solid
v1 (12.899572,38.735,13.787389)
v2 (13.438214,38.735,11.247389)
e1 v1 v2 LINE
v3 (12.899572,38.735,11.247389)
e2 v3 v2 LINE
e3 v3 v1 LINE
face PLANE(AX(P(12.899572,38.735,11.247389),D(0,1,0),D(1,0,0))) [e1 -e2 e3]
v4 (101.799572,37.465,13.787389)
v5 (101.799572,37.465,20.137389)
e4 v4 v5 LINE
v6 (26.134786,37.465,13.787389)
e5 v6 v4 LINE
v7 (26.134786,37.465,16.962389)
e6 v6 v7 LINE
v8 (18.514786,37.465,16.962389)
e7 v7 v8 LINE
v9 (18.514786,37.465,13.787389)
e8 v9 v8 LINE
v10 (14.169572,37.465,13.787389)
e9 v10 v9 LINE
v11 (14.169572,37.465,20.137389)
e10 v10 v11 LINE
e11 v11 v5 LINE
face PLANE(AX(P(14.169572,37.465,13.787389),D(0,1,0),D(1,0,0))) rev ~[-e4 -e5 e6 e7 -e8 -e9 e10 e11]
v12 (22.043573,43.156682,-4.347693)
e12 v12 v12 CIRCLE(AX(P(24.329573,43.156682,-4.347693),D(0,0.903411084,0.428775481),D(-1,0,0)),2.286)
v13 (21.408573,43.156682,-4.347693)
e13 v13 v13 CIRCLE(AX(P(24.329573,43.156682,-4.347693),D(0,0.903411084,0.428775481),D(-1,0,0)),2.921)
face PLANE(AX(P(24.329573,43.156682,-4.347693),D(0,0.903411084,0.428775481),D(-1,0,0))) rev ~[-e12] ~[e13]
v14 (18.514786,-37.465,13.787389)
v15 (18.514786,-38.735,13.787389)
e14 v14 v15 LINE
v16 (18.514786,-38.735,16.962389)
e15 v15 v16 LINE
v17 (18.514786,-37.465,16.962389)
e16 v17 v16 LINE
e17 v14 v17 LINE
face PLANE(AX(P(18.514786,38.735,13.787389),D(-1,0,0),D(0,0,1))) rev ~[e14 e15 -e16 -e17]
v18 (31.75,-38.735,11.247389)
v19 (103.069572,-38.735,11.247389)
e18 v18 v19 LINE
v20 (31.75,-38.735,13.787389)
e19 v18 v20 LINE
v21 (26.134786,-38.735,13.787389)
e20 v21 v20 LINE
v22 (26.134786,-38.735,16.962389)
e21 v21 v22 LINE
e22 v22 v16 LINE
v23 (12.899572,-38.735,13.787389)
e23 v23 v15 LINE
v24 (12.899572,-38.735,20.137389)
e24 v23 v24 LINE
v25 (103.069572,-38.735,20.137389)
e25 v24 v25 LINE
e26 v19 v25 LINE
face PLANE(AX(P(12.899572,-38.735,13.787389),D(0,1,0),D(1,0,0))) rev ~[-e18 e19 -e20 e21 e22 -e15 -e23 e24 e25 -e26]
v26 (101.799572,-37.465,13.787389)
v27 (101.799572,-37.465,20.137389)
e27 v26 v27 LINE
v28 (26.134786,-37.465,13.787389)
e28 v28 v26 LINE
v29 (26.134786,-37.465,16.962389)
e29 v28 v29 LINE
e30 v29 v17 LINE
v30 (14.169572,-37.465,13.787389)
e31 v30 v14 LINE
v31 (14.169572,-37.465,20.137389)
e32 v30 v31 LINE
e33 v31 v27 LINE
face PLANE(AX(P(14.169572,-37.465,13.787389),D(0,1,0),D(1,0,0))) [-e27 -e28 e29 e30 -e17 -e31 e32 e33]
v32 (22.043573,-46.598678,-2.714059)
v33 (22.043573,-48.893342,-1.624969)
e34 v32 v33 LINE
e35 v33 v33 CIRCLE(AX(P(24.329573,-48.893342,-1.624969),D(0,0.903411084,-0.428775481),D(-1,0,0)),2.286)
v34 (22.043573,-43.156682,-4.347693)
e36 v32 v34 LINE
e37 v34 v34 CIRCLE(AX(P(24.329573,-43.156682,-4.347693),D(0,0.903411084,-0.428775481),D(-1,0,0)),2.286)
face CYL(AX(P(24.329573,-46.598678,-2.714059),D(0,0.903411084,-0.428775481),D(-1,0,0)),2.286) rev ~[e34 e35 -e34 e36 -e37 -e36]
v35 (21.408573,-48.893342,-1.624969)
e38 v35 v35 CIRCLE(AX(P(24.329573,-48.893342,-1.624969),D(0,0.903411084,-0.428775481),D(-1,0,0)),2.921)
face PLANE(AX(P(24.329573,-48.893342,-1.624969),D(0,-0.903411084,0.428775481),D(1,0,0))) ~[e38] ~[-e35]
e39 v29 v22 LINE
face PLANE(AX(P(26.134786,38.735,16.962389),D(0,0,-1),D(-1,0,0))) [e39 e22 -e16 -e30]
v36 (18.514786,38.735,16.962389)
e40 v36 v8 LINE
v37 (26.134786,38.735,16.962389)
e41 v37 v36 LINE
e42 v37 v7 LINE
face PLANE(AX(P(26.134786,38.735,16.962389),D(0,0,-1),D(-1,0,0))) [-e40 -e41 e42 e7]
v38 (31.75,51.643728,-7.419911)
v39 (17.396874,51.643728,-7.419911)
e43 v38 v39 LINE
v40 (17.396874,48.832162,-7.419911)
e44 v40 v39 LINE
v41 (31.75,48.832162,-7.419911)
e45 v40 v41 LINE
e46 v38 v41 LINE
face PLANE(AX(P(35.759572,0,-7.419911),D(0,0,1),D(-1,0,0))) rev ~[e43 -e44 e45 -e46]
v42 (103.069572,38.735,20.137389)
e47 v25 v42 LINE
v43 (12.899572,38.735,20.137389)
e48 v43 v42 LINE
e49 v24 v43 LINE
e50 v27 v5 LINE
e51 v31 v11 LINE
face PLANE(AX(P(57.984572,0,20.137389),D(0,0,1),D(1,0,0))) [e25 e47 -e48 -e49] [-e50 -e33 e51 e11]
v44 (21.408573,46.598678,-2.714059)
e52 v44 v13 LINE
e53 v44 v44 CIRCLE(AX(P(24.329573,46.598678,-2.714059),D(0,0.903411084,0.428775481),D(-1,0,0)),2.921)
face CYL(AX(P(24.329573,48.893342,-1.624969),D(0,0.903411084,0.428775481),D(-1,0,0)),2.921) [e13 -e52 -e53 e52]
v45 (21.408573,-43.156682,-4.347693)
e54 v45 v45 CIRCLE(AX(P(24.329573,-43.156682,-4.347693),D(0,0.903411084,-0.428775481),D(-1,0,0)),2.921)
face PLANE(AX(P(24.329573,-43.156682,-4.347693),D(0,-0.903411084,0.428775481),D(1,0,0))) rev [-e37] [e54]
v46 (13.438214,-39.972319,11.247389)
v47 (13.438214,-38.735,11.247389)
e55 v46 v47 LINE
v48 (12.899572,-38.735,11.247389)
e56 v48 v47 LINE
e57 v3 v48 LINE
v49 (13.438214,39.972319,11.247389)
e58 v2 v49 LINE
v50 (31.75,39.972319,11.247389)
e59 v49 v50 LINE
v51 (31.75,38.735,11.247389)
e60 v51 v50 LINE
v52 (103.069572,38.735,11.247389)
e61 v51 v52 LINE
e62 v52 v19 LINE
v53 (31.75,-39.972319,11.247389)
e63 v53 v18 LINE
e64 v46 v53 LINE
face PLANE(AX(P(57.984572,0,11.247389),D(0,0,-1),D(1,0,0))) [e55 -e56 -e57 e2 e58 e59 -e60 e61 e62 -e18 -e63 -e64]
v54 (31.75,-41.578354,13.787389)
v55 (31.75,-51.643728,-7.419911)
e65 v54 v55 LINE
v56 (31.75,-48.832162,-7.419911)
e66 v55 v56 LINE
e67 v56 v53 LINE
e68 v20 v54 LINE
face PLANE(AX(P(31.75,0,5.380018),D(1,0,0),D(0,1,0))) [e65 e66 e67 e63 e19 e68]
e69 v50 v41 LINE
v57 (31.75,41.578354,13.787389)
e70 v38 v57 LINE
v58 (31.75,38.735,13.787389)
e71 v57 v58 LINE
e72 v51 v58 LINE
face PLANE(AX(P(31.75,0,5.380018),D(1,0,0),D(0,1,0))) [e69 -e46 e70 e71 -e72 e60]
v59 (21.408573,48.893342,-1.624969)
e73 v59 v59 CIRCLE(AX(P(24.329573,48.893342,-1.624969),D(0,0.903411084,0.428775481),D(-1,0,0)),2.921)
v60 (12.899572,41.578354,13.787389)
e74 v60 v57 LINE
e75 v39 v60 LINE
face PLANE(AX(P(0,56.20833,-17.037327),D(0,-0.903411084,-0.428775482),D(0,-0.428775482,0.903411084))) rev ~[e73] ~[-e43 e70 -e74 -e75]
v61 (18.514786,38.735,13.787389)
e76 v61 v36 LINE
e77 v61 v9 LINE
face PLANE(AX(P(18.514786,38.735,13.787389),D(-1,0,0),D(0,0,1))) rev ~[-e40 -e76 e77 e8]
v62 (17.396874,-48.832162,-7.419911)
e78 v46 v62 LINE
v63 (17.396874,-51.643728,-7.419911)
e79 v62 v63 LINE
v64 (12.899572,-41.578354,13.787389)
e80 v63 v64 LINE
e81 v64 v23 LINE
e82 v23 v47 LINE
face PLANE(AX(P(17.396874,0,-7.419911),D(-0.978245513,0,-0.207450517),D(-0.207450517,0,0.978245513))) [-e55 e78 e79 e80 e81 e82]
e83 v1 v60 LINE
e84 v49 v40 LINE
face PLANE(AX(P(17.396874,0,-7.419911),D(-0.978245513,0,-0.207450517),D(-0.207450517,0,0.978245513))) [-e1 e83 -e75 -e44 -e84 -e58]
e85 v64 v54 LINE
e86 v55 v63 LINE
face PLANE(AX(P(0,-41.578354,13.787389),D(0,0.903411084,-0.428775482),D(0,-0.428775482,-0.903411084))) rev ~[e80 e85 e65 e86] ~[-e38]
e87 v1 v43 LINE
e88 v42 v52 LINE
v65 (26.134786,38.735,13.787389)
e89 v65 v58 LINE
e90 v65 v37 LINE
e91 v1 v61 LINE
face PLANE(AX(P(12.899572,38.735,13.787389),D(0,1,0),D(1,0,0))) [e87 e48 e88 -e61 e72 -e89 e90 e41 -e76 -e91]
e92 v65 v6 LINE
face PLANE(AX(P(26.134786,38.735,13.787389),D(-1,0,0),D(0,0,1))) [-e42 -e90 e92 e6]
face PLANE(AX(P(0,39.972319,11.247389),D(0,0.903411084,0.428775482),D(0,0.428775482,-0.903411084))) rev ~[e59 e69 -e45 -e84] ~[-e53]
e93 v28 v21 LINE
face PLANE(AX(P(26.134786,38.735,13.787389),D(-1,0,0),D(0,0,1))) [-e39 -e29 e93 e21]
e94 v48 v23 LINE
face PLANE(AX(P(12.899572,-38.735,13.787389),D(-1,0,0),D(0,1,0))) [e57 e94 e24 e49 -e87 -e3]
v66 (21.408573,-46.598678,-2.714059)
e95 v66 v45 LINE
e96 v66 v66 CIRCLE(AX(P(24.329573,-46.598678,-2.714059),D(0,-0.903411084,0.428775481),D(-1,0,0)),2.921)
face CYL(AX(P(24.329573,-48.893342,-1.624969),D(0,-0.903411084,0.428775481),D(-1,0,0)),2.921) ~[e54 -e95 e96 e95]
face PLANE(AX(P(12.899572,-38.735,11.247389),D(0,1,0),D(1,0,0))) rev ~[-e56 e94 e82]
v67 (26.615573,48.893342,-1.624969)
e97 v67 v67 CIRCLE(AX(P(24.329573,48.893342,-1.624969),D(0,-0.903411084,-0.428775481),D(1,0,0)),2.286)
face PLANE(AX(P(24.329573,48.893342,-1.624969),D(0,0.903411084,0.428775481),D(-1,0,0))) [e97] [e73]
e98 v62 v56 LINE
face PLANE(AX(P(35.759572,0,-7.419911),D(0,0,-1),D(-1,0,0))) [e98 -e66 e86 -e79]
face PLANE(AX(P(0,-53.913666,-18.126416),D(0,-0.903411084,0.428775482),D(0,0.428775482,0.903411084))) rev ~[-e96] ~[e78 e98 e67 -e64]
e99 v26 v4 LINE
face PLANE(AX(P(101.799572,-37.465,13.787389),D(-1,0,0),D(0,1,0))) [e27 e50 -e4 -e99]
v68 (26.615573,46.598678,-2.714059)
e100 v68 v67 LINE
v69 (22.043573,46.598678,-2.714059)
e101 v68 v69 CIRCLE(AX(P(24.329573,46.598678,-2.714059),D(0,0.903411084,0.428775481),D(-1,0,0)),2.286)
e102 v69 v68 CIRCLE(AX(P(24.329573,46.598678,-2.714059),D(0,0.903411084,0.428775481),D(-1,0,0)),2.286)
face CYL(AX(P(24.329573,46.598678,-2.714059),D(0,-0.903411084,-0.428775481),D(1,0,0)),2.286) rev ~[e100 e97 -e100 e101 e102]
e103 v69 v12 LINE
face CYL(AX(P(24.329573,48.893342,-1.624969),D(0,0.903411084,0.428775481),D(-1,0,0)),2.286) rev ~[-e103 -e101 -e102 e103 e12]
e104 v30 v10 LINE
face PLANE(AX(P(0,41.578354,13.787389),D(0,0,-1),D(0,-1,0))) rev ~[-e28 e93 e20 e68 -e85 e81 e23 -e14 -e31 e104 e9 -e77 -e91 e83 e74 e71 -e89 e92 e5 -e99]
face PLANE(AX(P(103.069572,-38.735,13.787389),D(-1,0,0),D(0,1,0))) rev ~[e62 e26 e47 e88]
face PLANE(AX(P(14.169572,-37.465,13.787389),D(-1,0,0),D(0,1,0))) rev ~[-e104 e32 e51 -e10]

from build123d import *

# Parameters (mm, degrees)
F1_DEPTH      = 31.75
F2_R          = 0.127
F3_DEPTH      = 56.2093301913
F3_DEPTH_BACK = 56.2093301913
F4_W          = 90.17
F4_H          = 77.47
F5_DEPTH      = 2.54
F6_W          = 90.17
F6_H          = 77.47
F6_W_2        = 87.63
F6_H_2        = 74.93
F7_DEPTH      = 6.35
F11_W         = 7.62
F11_H         = 3.175
F12_DEPTH     = 79.756
F14_R         = 2.921
F14_R_2       = 2.286
F15_DEPTH     = 6.35
F15_FACE_R    = 2.286
F16_DEPTH     = 12.9286
F17_R         = 2.070357412
F18_DEPTH     = 25.4
F20_R         = 2.286
F21_DEPTH     = 25.4


# Not quite as in the source:
# - a pattern or mirror of a feature is missing from the dataset's text; its kind, count and spacing are read off the source's solid


with BuildPart() as f1:
    # F0 (on Right) → F1 (new body)
    with BuildSketch(Plane.YZ):
        Polygon((-53.9136660383, -18.1264164896), (-39.9723188616, 11.2473889307), (39.9723188616, 11.2473889307), (53.9136660383, -18.1264164896), (56.2083301913, -17.0373267665), (41.5783543673, 13.7873889307), (-41.5783543673, 13.7873889307), (-56.2083301913, -17.0373267665), align=None)
    extrude(amount=F1_DEPTH)

    # F2 (on Front) → F3 (cut, two sides)
    with BuildSketch(Plane.XZ) as f3_sk:
        Polygon((12.8995720297, 13.7873889307), (0, 13.7873889307), (0, -18.1264164896), (19.6673367172, -18.1264164896), (35.7595719397, -19.0736036748), (35.7595719397, -7.4199110855), (17.3968738801, -7.4199110855), align=None)
        with Locations((24.329572916, -1.6249689179)):
            Circle(F2_R)
    extrude(amount=-F3_DEPTH, mode=Mode.SUBTRACT)
    extrude(f3_sk.sketch, amount=F3_DEPTH_BACK, mode=Mode.SUBTRACT)

    # F4 (on face) → F5 (join, through all)
    with BuildSketch(Plane(origin=(0, 0, 11.2473889307), x_dir=(1, 0, 0), z_dir=(0, 0, -1))):
        with Locations((57.9845720297, 0)):
            Rectangle(F4_W, F4_H)
    extrude(amount=-F5_DEPTH)

    # F6 (on face) → F7 (join)
    with BuildSketch(Plane.XY.offset(13.7873889307)):
        with Locations((57.9845720297, 0)):
            Rectangle(F6_W, F6_H)
        with Locations((57.9845720297, 0)):
            Rectangle(F6_W_2, F6_H_2, mode=Mode.SUBTRACT)
    extrude(amount=F7_DEPTH)

    # F11 (on face) → F12 (cut)
    with BuildSketch(Plane(origin=(0, 38.735, 0), x_dir=(-1, 0, 0), z_dir=(0, 1, 0))):
        with Locations((-22.3247860149, 15.3748889307)):
            Rectangle(F11_W, F11_H)
    extrude(amount=-F12_DEPTH, mode=Mode.SUBTRACT)

    # F14 (on face) → F15 (join)
    with BuildSketch(Plane(origin=(0, 39.2749300586, 18.6406026544), x_dir=(-1, 0, 0), z_dir=(0, 0.9034110839, 0.4287754815))):
        with Locations((-24.329572916, -22.4322813106)):
            Circle(F14_R)
        with Locations((-24.329572916, -22.4322813106)):
            Circle(F14_R_2, mode=Mode.SUBTRACT)
    f15 = extrude(amount=-F15_DEPTH)

    # F15_copies: F15 across plane
    add(f15.mirror(Plane(origin=(0, 0, 0), x_dir=(0, 0, -1), z_dir=(0, -1, 0))))

    # F14 (on face) + F15_face (on face) → F16 (cut)
    with BuildSketch(Plane(origin=(0, 39.2749300586, 18.6406026544), x_dir=(-1, 0, 0), z_dir=(0, 0.9034110839, 0.4287754815))):
        with Locations((-24.329572916, -22.4322813106)):
            Circle(F14_R)
        with Locations((-24.329572916, -22.4322813106)):
            Circle(F14_R_2, mode=Mode.SUBTRACT)
    with BuildSketch(Plane(origin=(24.329572916, 46.6004501275, -2.7177921697), x_dir=(1, 0, 0), z_dir=(0, -0.9034110839, -0.4287754815))):
        with Locations((0, 0.004132702)):
            Circle(F15_FACE_R)
        with BuildLine():
            add(Edge.make_bspline(
                [(0.127, 1.2096633209), (0.127, 0.9661745521), (-0.0635, 1.0879189365), (-0.254, 1.2096633209), (-0.0635, 1.3314077053), (0.127, 1.4531520897), (0.127, 1.2096633209)],
                knots=[1.5707963268, 1.5707963268, 1.5707963268, 3.6651914292, 3.6651914292, 5.7595865316, 5.7595865316, 7.853981634, 7.853981634, 7.853981634], degree=2, weights=[1, 0.5, 1, 0.5, 1, 0.5, 1]))
        make_face(mode=Mode.SUBTRACT)
    extrude(amount=F16_DEPTH, dir=(0, 0.9034110839, 0.4287754815), mode=Mode.SUBTRACT)

    # F17 (on face) → F18 (cut)
    with BuildSketch(Plane(origin=(0, 33.5382696761, 15.9178783467), x_dir=(1, 0, 0), z_dir=(0, -0.9034110839, -0.4287754815))):
        with Locations((24.329572916, -22.4322813106)):
            Circle(F17_R)
    extrude(amount=-F18_DEPTH, mode=Mode.SUBTRACT)

    # F20 (on face) → F21 (cut)
    with BuildSketch(Plane(origin=(0, -36.9802659056, 17.5515129313), x_dir=(-1, 0, 0), z_dir=(0, 0.9034110839, -0.4287754815))):
        with Locations((-24.329572916, -22.4322813106)):
            Circle(F20_R)
    extrude(amount=-F21_DEPTH, mode=Mode.SUBTRACT)


solid = f1.part
